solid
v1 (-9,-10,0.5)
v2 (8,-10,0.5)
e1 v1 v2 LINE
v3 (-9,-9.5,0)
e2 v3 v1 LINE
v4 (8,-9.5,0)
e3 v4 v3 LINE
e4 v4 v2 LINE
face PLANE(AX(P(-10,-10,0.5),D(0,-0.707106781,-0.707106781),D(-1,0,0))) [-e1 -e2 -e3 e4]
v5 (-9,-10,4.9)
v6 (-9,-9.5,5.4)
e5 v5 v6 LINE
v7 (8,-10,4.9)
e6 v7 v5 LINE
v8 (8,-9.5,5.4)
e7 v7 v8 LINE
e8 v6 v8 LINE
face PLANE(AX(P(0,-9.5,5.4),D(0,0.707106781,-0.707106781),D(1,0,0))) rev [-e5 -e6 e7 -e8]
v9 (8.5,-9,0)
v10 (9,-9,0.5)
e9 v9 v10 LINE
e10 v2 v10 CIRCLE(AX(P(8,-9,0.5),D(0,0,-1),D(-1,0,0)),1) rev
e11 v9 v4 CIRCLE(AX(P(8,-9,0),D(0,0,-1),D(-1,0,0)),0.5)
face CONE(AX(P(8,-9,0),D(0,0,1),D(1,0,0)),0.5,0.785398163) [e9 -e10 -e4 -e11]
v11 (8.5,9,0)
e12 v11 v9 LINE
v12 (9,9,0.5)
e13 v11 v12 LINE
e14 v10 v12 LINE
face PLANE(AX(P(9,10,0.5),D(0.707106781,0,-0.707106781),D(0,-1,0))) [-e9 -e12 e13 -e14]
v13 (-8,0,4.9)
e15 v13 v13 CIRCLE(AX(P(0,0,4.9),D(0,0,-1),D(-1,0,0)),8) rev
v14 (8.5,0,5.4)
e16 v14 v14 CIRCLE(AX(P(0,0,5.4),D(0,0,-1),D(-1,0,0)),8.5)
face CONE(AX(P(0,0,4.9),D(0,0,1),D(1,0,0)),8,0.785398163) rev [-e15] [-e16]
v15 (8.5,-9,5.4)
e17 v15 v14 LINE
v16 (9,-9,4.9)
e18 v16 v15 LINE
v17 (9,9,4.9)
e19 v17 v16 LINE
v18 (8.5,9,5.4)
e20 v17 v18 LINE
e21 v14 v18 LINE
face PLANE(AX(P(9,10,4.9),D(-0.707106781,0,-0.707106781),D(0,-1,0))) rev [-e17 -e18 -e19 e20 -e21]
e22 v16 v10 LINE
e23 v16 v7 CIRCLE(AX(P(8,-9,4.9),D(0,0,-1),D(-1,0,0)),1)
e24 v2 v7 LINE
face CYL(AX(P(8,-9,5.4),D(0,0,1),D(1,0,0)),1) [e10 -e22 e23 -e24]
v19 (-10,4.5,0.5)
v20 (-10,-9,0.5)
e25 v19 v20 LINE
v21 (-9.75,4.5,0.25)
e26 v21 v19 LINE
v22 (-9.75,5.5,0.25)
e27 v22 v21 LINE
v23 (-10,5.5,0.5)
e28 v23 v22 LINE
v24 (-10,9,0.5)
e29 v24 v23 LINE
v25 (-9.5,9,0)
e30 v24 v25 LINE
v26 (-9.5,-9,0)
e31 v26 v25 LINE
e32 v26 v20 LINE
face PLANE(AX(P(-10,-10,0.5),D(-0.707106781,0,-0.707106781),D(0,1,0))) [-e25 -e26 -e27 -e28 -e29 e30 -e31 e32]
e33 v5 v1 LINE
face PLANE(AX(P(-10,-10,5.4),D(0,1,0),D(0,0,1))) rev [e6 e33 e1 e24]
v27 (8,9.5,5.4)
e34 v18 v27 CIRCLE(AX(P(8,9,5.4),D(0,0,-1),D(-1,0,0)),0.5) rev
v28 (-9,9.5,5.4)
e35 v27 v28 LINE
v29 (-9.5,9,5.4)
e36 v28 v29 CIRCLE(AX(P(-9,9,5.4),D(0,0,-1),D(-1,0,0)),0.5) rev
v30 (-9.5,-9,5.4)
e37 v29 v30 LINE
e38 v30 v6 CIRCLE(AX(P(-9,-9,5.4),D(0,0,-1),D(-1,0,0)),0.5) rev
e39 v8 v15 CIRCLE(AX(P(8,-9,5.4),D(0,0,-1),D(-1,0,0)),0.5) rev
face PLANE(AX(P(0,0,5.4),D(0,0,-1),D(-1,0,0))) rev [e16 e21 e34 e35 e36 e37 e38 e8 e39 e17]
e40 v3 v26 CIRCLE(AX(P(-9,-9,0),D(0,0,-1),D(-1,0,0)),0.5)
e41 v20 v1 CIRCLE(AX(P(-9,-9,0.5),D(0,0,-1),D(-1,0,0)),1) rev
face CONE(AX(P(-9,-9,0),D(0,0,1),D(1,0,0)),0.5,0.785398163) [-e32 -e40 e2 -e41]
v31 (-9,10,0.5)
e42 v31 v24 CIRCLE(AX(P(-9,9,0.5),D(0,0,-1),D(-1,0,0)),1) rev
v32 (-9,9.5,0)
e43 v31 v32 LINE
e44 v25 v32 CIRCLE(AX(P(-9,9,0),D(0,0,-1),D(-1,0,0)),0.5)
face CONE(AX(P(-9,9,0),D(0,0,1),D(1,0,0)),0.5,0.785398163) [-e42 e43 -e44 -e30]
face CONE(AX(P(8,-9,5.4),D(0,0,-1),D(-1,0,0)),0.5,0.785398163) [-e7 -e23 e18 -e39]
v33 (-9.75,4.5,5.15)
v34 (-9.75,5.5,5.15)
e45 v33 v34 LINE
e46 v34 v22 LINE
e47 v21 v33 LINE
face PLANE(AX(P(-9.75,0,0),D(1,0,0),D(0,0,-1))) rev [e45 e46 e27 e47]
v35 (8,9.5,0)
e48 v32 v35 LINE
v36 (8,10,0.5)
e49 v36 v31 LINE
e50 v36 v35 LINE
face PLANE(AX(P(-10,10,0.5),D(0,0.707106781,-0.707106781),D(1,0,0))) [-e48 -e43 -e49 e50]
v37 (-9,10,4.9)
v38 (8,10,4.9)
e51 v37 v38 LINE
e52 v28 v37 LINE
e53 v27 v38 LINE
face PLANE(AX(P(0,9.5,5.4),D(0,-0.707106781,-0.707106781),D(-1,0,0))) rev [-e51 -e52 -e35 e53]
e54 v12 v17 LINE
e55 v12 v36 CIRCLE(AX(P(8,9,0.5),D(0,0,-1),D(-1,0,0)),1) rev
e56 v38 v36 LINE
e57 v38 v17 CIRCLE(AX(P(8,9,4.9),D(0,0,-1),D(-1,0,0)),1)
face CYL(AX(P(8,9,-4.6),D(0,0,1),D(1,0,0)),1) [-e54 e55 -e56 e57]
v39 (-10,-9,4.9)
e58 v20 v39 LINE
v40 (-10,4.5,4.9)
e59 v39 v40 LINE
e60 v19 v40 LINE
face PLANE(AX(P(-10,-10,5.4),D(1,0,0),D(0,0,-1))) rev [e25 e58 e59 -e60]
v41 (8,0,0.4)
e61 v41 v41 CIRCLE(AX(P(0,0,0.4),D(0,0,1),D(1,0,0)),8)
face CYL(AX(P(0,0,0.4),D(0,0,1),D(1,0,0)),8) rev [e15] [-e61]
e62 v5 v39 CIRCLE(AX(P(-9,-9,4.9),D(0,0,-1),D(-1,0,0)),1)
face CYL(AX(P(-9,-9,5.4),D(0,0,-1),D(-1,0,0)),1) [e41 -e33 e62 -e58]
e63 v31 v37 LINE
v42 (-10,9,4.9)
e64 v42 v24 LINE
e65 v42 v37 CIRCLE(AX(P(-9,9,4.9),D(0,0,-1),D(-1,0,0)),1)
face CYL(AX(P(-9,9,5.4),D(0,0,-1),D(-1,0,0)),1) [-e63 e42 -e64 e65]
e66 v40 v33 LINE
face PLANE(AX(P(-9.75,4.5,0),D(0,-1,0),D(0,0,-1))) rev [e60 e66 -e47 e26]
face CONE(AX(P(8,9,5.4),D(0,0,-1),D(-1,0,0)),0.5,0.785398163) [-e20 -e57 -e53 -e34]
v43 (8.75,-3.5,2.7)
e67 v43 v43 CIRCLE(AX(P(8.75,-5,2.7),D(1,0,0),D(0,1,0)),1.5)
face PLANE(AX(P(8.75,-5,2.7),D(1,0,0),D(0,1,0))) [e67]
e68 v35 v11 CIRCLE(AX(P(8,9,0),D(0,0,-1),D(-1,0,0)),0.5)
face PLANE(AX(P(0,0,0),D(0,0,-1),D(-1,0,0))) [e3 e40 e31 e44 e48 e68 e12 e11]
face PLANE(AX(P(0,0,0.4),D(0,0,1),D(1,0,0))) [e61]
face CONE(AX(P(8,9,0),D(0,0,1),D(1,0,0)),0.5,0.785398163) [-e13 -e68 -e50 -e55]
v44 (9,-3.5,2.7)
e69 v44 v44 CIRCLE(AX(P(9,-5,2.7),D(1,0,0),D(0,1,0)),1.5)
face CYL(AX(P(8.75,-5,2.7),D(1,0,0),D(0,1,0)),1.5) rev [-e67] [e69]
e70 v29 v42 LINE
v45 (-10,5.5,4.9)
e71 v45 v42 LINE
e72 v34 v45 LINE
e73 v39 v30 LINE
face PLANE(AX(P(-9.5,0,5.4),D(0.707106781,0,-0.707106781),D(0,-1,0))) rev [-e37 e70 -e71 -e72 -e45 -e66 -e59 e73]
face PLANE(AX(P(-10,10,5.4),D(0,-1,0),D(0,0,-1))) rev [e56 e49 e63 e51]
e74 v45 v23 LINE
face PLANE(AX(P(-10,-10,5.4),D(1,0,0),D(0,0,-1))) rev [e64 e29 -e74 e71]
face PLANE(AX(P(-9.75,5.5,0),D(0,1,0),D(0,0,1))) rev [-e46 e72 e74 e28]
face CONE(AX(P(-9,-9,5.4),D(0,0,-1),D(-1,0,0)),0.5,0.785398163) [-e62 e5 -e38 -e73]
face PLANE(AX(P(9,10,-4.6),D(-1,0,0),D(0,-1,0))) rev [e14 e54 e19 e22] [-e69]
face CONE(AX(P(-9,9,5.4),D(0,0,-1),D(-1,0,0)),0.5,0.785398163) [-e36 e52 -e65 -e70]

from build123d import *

# Parameters (mm, degrees)
SKETCH1_W           = 20
SKETCH1_H           = 20
BOSS_EXTRUDE1_DEPTH = 5.4
SKETCH2_R           = 8
CUT_EXTRUDE1_DEPTH  = 5
SKETCH4_W           = 1
SKETCH4_H           = 20
CUT_EXTRUDE3_DEPTH  = 10
SKETCH3_R           = 1.5
CUT_EXTRUDE2_DEPTH  = 0.25
SKETCH5_W           = 5.4
SKETCH5_H           = 1
CUT_EXTRUDE4_DEPTH  = 0.25
FILLET1_R           = 1
CHAMFER1_SIZE       = 0.5


with BuildPart() as part:
    # Sketch1 → Boss-Extrude1 (new body)
    with BuildSketch(Plane.XY):
        Rectangle(SKETCH1_W, SKETCH1_H)
    extrude(amount=BOSS_EXTRUDE1_DEPTH)

    # Sketch2 → Cut-Extrude1 (cut)
    with BuildSketch(Plane.XY.offset(5.4)):
        Circle(SKETCH2_R)
    extrude(amount=-CUT_EXTRUDE1_DEPTH, mode=Mode.SUBTRACT)

    # Sketch4 → Cut-Extrude3 (cut)
    with BuildSketch(Plane.XY.offset(5.4)):
        with Locations((9.5, 0)):
            Rectangle(SKETCH4_W, SKETCH4_H)
    extrude(amount=-CUT_EXTRUDE3_DEPTH, mode=Mode.SUBTRACT)

    # Sketch3 → Cut-Extrude2 (cut)
    with BuildSketch(Plane(origin=(9, 0, 0), x_dir=(0, 0, -1), z_dir=(1, 0, 0))):
        with Locations(Location((-2.7, -5, 0), (0, 0, 90))):
            Circle(SKETCH3_R)
    extrude(amount=-CUT_EXTRUDE2_DEPTH, mode=Mode.SUBTRACT)

    # Sketch5 → Cut-Extrude4 (cut)
    with BuildSketch(Plane.ZY.offset(10)):
        with Locations((2.7, 5)):
            Rectangle(SKETCH5_W, SKETCH5_H)
    extrude(amount=-CUT_EXTRUDE4_DEPTH, mode=Mode.SUBTRACT)

    # Fillet1
    fillet1_edges = [part.edges().sort_by_distance(p)[0] for p in [
        (9, -10, 2.7),
        (9, 10, 2.7),
        (-10, -10, 2.7),
        (-10, 10, 2.7),
    ]]
    fillet(fillet1_edges, radius=FILLET1_R)

    # Chamfer1
    # the kernel refuses this chamfer: 0.5 mm, written as the material it takes off along each edge
    with BuildSketch(Plane(origin=(8, 10, 0), x_dir=(0, -0.9996219169112968, -0.02749587661058639), z_dir=(-1, 0, 0)), Plane(origin=(-9, -10, 5.4), x_dir=(0, -0.027495876610585647, -0.9996219169112968), z_dir=(1, 0, 0))) as chamfer1_piece_1:
        Polygon((CHAMFER1_SIZE * 0.999621916911, CHAMFER1_SIZE * 0.0274958766106), (-CHAMFER1_SIZE * 0.0274958766106, CHAMFER1_SIZE * 0.999621916911), (0, 0), align=None)
    extrude(amount=17, mode=Mode.SUBTRACT)
    with BuildSketch(Plane(origin=(-9, 9, 0), x_dir=(0, 1, 0), z_dir=(1, 0, 0))) as chamfer1_piece_2:
        Polygon((1 - CHAMFER1_SIZE, 0), (1, CHAMFER1_SIZE), (1, 0), align=None)
    revolve(axis=Axis((-9, 9, 0), (0, 0, 1)), revolution_arc=90, mode=Mode.SUBTRACT)
    with BuildSketch(Plane(origin=(-10, 5.785841494, 0), x_dir=(0.9996219169112968, 0, -0.02749587661058639), z_dir=(0, -1, 0))) as chamfer1_piece_3:
        Polygon((CHAMFER1_SIZE * 0.999621916911, CHAMFER1_SIZE * 0.0274958766106), (-CHAMFER1_SIZE * 0.0274958766106, CHAMFER1_SIZE * 0.999621916911), (0, 0), align=None)
    extrude(amount=14.785841494, mode=Mode.SUBTRACT)
    with BuildSketch(Plane(origin=(-10, 9, 0), x_dir=(0.9996219169112968, 0, -0.02749587661058639), z_dir=(0, -1, 0))) as chamfer1_piece_4:
        Polygon((CHAMFER1_SIZE * 0.999621916911, CHAMFER1_SIZE * 0.0274958766106), (-CHAMFER1_SIZE * 0.0274958766106, CHAMFER1_SIZE * 0.999621916911), (0, 0), align=None)
    extrude(amount=4.785841494, mode=Mode.SUBTRACT)
    with BuildSketch(Plane(origin=(-9, -9, 0), x_dir=(0, -1, 0), z_dir=(1, 0, 0))) as chamfer1_piece_5:
        Polygon((1 - CHAMFER1_SIZE, 0), (1, -CHAMFER1_SIZE), (1, 0), align=None)
    revolve(axis=Axis((-9, -9, 0), (0, 0, -1)), revolution_arc=90, mode=Mode.SUBTRACT)
    with BuildSketch(Plane(origin=(-9, -10, 0), x_dir=(0, -0.02749587661058563, 0.9996219169112968), z_dir=(1, 0, 0)), Plane(origin=(8, 10, 5.4), x_dir=(0, -0.9996219169112968, 0.027495876610585647), z_dir=(-1, 0, 0))) as chamfer1_piece_6:
        Polygon((CHAMFER1_SIZE * 0.999621916911, -CHAMFER1_SIZE * 0.0274958766106), (-CHAMFER1_SIZE * 0.0274958766106, -CHAMFER1_SIZE * 0.999621916911), (0, 0), align=None)
    extrude(amount=17, mode=Mode.SUBTRACT)
    with BuildSketch(Plane(origin=(-9, -9, 5.4), x_dir=(0, -1, 0), z_dir=(1, 0, 0))) as chamfer1_piece_7:
        Polygon((1, CHAMFER1_SIZE), (1 - CHAMFER1_SIZE, 0), (1, 0), align=None)
    revolve(axis=Axis((-9, -9, 5.4), (0, 0, -1)), revolution_arc=90, mode=Mode.SUBTRACT)
    with BuildSketch(Plane(origin=(-10, 9, 5.4), x_dir=(0.9996219169112968, 0, 0.027495876610585647), z_dir=(0, -1, 0))) as chamfer1_piece_8:
        Polygon((CHAMFER1_SIZE * 0.999621916911, -CHAMFER1_SIZE * 0.0274958766106), (-CHAMFER1_SIZE * 0.0274958766106, -CHAMFER1_SIZE * 0.999621916911), (0, 0), align=None)
    extrude(amount=4.785841494, mode=Mode.SUBTRACT)
    with BuildSketch(Plane(origin=(-10, 5.785841494, 5.4), x_dir=(0.9996219169112968, 0, 0.027495876610585647), z_dir=(0, -1, 0))) as chamfer1_piece_9:
        Polygon((CHAMFER1_SIZE * 0.999621916911, -CHAMFER1_SIZE * 0.0274958766106), (-CHAMFER1_SIZE * 0.0274958766106, -CHAMFER1_SIZE * 0.999621916911), (0, 0), align=None)
    extrude(amount=14.785841494, mode=Mode.SUBTRACT)
    with BuildSketch(Plane(origin=(-9, 9, 5.4), x_dir=(0, 1, 0), z_dir=(1, 0, 0))) as chamfer1_piece_10:
        Polygon((1 - CHAMFER1_SIZE, 0), (1, -CHAMFER1_SIZE), (1, 0), align=None)
    revolve(axis=Axis((-9, 9, 5.4), (0, 0, 1)), revolution_arc=90, mode=Mode.SUBTRACT)
    with BuildSketch(Plane(origin=(0, 0, 5.4), x_dir=(1, 0, 0), z_dir=(0, -1, 0))) as chamfer1_piece_11:
        Polygon((8 + CHAMFER1_SIZE, 0), (8, -CHAMFER1_SIZE), (8, 0), align=None)
    revolve(axis=Axis((0, 0, 5.4), (0, 0, 1)), mode=Mode.SUBTRACT)
    with BuildSketch(Plane(origin=(9, 9, 0), x_dir=(-0.9996219169112968, 0, -0.02749587661058639), z_dir=(0, -1, 0))) as chamfer1_piece_12:
        Polygon((CHAMFER1_SIZE * 0.999621916911, -CHAMFER1_SIZE * 0.0274958766106), (-CHAMFER1_SIZE * 0.0274958766106, -CHAMFER1_SIZE * 0.999621916911), (0, 0), align=None)
    extrude(amount=18, mode=Mode.SUBTRACT)
    with BuildSketch(Plane(origin=(9, 9, 5.4), x_dir=(-0.9996219169112968, 0, 0.027495876610585647), z_dir=(0, -1, 0))) as chamfer1_piece_13:
        Polygon((CHAMFER1_SIZE * 0.999621916911, CHAMFER1_SIZE * 0.0274958766106), (-CHAMFER1_SIZE * 0.0274958766106, CHAMFER1_SIZE * 0.999621916911), (0, 0), align=None)
    extrude(amount=18, mode=Mode.SUBTRACT)
    with BuildSketch(Plane(origin=(8, 9, 0), x_dir=(1, 0, 0), z_dir=(0, -1, 0))) as chamfer1_piece_14:
        Polygon((1 - CHAMFER1_SIZE, 0), (1, CHAMFER1_SIZE), (1, 0), align=None)
    revolve(axis=Axis((8, 9, 0), (0, 0, 1)), revolution_arc=90, mode=Mode.SUBTRACT)
    with BuildSketch(Plane(origin=(8, -9, 0), x_dir=(0, -1, 0), z_dir=(-1, 0, 0))) as chamfer1_piece_15:
        Polygon((1 - CHAMFER1_SIZE, 0), (1, CHAMFER1_SIZE), (1, 0), align=None)
    revolve(axis=Axis((8, -9, 0), (0, 0, 1)), revolution_arc=90, mode=Mode.SUBTRACT)
    with BuildSketch(Plane(origin=(8, 9, 5.4), x_dir=(1, 0, 0), z_dir=(0, -1, 0))) as chamfer1_piece_16:
        Polygon((1 - CHAMFER1_SIZE, 0), (1, -CHAMFER1_SIZE), (1, 0), align=None)
    revolve(axis=Axis((8, 9, 5.4), (0, 0, 1)), revolution_arc=90, mode=Mode.SUBTRACT)
    with BuildSketch(Plane(origin=(8, -9, 5.4), x_dir=(0, -1, 0), z_dir=(-1, 0, 0))) as chamfer1_piece_17:
        Polygon((1, -CHAMFER1_SIZE), (1 - CHAMFER1_SIZE, 0), (1, 0), align=None)
    revolve(axis=Axis((8, -9, 5.4), (0, 0, 1)), revolution_arc=90, mode=Mode.SUBTRACT)


solid = part.part
